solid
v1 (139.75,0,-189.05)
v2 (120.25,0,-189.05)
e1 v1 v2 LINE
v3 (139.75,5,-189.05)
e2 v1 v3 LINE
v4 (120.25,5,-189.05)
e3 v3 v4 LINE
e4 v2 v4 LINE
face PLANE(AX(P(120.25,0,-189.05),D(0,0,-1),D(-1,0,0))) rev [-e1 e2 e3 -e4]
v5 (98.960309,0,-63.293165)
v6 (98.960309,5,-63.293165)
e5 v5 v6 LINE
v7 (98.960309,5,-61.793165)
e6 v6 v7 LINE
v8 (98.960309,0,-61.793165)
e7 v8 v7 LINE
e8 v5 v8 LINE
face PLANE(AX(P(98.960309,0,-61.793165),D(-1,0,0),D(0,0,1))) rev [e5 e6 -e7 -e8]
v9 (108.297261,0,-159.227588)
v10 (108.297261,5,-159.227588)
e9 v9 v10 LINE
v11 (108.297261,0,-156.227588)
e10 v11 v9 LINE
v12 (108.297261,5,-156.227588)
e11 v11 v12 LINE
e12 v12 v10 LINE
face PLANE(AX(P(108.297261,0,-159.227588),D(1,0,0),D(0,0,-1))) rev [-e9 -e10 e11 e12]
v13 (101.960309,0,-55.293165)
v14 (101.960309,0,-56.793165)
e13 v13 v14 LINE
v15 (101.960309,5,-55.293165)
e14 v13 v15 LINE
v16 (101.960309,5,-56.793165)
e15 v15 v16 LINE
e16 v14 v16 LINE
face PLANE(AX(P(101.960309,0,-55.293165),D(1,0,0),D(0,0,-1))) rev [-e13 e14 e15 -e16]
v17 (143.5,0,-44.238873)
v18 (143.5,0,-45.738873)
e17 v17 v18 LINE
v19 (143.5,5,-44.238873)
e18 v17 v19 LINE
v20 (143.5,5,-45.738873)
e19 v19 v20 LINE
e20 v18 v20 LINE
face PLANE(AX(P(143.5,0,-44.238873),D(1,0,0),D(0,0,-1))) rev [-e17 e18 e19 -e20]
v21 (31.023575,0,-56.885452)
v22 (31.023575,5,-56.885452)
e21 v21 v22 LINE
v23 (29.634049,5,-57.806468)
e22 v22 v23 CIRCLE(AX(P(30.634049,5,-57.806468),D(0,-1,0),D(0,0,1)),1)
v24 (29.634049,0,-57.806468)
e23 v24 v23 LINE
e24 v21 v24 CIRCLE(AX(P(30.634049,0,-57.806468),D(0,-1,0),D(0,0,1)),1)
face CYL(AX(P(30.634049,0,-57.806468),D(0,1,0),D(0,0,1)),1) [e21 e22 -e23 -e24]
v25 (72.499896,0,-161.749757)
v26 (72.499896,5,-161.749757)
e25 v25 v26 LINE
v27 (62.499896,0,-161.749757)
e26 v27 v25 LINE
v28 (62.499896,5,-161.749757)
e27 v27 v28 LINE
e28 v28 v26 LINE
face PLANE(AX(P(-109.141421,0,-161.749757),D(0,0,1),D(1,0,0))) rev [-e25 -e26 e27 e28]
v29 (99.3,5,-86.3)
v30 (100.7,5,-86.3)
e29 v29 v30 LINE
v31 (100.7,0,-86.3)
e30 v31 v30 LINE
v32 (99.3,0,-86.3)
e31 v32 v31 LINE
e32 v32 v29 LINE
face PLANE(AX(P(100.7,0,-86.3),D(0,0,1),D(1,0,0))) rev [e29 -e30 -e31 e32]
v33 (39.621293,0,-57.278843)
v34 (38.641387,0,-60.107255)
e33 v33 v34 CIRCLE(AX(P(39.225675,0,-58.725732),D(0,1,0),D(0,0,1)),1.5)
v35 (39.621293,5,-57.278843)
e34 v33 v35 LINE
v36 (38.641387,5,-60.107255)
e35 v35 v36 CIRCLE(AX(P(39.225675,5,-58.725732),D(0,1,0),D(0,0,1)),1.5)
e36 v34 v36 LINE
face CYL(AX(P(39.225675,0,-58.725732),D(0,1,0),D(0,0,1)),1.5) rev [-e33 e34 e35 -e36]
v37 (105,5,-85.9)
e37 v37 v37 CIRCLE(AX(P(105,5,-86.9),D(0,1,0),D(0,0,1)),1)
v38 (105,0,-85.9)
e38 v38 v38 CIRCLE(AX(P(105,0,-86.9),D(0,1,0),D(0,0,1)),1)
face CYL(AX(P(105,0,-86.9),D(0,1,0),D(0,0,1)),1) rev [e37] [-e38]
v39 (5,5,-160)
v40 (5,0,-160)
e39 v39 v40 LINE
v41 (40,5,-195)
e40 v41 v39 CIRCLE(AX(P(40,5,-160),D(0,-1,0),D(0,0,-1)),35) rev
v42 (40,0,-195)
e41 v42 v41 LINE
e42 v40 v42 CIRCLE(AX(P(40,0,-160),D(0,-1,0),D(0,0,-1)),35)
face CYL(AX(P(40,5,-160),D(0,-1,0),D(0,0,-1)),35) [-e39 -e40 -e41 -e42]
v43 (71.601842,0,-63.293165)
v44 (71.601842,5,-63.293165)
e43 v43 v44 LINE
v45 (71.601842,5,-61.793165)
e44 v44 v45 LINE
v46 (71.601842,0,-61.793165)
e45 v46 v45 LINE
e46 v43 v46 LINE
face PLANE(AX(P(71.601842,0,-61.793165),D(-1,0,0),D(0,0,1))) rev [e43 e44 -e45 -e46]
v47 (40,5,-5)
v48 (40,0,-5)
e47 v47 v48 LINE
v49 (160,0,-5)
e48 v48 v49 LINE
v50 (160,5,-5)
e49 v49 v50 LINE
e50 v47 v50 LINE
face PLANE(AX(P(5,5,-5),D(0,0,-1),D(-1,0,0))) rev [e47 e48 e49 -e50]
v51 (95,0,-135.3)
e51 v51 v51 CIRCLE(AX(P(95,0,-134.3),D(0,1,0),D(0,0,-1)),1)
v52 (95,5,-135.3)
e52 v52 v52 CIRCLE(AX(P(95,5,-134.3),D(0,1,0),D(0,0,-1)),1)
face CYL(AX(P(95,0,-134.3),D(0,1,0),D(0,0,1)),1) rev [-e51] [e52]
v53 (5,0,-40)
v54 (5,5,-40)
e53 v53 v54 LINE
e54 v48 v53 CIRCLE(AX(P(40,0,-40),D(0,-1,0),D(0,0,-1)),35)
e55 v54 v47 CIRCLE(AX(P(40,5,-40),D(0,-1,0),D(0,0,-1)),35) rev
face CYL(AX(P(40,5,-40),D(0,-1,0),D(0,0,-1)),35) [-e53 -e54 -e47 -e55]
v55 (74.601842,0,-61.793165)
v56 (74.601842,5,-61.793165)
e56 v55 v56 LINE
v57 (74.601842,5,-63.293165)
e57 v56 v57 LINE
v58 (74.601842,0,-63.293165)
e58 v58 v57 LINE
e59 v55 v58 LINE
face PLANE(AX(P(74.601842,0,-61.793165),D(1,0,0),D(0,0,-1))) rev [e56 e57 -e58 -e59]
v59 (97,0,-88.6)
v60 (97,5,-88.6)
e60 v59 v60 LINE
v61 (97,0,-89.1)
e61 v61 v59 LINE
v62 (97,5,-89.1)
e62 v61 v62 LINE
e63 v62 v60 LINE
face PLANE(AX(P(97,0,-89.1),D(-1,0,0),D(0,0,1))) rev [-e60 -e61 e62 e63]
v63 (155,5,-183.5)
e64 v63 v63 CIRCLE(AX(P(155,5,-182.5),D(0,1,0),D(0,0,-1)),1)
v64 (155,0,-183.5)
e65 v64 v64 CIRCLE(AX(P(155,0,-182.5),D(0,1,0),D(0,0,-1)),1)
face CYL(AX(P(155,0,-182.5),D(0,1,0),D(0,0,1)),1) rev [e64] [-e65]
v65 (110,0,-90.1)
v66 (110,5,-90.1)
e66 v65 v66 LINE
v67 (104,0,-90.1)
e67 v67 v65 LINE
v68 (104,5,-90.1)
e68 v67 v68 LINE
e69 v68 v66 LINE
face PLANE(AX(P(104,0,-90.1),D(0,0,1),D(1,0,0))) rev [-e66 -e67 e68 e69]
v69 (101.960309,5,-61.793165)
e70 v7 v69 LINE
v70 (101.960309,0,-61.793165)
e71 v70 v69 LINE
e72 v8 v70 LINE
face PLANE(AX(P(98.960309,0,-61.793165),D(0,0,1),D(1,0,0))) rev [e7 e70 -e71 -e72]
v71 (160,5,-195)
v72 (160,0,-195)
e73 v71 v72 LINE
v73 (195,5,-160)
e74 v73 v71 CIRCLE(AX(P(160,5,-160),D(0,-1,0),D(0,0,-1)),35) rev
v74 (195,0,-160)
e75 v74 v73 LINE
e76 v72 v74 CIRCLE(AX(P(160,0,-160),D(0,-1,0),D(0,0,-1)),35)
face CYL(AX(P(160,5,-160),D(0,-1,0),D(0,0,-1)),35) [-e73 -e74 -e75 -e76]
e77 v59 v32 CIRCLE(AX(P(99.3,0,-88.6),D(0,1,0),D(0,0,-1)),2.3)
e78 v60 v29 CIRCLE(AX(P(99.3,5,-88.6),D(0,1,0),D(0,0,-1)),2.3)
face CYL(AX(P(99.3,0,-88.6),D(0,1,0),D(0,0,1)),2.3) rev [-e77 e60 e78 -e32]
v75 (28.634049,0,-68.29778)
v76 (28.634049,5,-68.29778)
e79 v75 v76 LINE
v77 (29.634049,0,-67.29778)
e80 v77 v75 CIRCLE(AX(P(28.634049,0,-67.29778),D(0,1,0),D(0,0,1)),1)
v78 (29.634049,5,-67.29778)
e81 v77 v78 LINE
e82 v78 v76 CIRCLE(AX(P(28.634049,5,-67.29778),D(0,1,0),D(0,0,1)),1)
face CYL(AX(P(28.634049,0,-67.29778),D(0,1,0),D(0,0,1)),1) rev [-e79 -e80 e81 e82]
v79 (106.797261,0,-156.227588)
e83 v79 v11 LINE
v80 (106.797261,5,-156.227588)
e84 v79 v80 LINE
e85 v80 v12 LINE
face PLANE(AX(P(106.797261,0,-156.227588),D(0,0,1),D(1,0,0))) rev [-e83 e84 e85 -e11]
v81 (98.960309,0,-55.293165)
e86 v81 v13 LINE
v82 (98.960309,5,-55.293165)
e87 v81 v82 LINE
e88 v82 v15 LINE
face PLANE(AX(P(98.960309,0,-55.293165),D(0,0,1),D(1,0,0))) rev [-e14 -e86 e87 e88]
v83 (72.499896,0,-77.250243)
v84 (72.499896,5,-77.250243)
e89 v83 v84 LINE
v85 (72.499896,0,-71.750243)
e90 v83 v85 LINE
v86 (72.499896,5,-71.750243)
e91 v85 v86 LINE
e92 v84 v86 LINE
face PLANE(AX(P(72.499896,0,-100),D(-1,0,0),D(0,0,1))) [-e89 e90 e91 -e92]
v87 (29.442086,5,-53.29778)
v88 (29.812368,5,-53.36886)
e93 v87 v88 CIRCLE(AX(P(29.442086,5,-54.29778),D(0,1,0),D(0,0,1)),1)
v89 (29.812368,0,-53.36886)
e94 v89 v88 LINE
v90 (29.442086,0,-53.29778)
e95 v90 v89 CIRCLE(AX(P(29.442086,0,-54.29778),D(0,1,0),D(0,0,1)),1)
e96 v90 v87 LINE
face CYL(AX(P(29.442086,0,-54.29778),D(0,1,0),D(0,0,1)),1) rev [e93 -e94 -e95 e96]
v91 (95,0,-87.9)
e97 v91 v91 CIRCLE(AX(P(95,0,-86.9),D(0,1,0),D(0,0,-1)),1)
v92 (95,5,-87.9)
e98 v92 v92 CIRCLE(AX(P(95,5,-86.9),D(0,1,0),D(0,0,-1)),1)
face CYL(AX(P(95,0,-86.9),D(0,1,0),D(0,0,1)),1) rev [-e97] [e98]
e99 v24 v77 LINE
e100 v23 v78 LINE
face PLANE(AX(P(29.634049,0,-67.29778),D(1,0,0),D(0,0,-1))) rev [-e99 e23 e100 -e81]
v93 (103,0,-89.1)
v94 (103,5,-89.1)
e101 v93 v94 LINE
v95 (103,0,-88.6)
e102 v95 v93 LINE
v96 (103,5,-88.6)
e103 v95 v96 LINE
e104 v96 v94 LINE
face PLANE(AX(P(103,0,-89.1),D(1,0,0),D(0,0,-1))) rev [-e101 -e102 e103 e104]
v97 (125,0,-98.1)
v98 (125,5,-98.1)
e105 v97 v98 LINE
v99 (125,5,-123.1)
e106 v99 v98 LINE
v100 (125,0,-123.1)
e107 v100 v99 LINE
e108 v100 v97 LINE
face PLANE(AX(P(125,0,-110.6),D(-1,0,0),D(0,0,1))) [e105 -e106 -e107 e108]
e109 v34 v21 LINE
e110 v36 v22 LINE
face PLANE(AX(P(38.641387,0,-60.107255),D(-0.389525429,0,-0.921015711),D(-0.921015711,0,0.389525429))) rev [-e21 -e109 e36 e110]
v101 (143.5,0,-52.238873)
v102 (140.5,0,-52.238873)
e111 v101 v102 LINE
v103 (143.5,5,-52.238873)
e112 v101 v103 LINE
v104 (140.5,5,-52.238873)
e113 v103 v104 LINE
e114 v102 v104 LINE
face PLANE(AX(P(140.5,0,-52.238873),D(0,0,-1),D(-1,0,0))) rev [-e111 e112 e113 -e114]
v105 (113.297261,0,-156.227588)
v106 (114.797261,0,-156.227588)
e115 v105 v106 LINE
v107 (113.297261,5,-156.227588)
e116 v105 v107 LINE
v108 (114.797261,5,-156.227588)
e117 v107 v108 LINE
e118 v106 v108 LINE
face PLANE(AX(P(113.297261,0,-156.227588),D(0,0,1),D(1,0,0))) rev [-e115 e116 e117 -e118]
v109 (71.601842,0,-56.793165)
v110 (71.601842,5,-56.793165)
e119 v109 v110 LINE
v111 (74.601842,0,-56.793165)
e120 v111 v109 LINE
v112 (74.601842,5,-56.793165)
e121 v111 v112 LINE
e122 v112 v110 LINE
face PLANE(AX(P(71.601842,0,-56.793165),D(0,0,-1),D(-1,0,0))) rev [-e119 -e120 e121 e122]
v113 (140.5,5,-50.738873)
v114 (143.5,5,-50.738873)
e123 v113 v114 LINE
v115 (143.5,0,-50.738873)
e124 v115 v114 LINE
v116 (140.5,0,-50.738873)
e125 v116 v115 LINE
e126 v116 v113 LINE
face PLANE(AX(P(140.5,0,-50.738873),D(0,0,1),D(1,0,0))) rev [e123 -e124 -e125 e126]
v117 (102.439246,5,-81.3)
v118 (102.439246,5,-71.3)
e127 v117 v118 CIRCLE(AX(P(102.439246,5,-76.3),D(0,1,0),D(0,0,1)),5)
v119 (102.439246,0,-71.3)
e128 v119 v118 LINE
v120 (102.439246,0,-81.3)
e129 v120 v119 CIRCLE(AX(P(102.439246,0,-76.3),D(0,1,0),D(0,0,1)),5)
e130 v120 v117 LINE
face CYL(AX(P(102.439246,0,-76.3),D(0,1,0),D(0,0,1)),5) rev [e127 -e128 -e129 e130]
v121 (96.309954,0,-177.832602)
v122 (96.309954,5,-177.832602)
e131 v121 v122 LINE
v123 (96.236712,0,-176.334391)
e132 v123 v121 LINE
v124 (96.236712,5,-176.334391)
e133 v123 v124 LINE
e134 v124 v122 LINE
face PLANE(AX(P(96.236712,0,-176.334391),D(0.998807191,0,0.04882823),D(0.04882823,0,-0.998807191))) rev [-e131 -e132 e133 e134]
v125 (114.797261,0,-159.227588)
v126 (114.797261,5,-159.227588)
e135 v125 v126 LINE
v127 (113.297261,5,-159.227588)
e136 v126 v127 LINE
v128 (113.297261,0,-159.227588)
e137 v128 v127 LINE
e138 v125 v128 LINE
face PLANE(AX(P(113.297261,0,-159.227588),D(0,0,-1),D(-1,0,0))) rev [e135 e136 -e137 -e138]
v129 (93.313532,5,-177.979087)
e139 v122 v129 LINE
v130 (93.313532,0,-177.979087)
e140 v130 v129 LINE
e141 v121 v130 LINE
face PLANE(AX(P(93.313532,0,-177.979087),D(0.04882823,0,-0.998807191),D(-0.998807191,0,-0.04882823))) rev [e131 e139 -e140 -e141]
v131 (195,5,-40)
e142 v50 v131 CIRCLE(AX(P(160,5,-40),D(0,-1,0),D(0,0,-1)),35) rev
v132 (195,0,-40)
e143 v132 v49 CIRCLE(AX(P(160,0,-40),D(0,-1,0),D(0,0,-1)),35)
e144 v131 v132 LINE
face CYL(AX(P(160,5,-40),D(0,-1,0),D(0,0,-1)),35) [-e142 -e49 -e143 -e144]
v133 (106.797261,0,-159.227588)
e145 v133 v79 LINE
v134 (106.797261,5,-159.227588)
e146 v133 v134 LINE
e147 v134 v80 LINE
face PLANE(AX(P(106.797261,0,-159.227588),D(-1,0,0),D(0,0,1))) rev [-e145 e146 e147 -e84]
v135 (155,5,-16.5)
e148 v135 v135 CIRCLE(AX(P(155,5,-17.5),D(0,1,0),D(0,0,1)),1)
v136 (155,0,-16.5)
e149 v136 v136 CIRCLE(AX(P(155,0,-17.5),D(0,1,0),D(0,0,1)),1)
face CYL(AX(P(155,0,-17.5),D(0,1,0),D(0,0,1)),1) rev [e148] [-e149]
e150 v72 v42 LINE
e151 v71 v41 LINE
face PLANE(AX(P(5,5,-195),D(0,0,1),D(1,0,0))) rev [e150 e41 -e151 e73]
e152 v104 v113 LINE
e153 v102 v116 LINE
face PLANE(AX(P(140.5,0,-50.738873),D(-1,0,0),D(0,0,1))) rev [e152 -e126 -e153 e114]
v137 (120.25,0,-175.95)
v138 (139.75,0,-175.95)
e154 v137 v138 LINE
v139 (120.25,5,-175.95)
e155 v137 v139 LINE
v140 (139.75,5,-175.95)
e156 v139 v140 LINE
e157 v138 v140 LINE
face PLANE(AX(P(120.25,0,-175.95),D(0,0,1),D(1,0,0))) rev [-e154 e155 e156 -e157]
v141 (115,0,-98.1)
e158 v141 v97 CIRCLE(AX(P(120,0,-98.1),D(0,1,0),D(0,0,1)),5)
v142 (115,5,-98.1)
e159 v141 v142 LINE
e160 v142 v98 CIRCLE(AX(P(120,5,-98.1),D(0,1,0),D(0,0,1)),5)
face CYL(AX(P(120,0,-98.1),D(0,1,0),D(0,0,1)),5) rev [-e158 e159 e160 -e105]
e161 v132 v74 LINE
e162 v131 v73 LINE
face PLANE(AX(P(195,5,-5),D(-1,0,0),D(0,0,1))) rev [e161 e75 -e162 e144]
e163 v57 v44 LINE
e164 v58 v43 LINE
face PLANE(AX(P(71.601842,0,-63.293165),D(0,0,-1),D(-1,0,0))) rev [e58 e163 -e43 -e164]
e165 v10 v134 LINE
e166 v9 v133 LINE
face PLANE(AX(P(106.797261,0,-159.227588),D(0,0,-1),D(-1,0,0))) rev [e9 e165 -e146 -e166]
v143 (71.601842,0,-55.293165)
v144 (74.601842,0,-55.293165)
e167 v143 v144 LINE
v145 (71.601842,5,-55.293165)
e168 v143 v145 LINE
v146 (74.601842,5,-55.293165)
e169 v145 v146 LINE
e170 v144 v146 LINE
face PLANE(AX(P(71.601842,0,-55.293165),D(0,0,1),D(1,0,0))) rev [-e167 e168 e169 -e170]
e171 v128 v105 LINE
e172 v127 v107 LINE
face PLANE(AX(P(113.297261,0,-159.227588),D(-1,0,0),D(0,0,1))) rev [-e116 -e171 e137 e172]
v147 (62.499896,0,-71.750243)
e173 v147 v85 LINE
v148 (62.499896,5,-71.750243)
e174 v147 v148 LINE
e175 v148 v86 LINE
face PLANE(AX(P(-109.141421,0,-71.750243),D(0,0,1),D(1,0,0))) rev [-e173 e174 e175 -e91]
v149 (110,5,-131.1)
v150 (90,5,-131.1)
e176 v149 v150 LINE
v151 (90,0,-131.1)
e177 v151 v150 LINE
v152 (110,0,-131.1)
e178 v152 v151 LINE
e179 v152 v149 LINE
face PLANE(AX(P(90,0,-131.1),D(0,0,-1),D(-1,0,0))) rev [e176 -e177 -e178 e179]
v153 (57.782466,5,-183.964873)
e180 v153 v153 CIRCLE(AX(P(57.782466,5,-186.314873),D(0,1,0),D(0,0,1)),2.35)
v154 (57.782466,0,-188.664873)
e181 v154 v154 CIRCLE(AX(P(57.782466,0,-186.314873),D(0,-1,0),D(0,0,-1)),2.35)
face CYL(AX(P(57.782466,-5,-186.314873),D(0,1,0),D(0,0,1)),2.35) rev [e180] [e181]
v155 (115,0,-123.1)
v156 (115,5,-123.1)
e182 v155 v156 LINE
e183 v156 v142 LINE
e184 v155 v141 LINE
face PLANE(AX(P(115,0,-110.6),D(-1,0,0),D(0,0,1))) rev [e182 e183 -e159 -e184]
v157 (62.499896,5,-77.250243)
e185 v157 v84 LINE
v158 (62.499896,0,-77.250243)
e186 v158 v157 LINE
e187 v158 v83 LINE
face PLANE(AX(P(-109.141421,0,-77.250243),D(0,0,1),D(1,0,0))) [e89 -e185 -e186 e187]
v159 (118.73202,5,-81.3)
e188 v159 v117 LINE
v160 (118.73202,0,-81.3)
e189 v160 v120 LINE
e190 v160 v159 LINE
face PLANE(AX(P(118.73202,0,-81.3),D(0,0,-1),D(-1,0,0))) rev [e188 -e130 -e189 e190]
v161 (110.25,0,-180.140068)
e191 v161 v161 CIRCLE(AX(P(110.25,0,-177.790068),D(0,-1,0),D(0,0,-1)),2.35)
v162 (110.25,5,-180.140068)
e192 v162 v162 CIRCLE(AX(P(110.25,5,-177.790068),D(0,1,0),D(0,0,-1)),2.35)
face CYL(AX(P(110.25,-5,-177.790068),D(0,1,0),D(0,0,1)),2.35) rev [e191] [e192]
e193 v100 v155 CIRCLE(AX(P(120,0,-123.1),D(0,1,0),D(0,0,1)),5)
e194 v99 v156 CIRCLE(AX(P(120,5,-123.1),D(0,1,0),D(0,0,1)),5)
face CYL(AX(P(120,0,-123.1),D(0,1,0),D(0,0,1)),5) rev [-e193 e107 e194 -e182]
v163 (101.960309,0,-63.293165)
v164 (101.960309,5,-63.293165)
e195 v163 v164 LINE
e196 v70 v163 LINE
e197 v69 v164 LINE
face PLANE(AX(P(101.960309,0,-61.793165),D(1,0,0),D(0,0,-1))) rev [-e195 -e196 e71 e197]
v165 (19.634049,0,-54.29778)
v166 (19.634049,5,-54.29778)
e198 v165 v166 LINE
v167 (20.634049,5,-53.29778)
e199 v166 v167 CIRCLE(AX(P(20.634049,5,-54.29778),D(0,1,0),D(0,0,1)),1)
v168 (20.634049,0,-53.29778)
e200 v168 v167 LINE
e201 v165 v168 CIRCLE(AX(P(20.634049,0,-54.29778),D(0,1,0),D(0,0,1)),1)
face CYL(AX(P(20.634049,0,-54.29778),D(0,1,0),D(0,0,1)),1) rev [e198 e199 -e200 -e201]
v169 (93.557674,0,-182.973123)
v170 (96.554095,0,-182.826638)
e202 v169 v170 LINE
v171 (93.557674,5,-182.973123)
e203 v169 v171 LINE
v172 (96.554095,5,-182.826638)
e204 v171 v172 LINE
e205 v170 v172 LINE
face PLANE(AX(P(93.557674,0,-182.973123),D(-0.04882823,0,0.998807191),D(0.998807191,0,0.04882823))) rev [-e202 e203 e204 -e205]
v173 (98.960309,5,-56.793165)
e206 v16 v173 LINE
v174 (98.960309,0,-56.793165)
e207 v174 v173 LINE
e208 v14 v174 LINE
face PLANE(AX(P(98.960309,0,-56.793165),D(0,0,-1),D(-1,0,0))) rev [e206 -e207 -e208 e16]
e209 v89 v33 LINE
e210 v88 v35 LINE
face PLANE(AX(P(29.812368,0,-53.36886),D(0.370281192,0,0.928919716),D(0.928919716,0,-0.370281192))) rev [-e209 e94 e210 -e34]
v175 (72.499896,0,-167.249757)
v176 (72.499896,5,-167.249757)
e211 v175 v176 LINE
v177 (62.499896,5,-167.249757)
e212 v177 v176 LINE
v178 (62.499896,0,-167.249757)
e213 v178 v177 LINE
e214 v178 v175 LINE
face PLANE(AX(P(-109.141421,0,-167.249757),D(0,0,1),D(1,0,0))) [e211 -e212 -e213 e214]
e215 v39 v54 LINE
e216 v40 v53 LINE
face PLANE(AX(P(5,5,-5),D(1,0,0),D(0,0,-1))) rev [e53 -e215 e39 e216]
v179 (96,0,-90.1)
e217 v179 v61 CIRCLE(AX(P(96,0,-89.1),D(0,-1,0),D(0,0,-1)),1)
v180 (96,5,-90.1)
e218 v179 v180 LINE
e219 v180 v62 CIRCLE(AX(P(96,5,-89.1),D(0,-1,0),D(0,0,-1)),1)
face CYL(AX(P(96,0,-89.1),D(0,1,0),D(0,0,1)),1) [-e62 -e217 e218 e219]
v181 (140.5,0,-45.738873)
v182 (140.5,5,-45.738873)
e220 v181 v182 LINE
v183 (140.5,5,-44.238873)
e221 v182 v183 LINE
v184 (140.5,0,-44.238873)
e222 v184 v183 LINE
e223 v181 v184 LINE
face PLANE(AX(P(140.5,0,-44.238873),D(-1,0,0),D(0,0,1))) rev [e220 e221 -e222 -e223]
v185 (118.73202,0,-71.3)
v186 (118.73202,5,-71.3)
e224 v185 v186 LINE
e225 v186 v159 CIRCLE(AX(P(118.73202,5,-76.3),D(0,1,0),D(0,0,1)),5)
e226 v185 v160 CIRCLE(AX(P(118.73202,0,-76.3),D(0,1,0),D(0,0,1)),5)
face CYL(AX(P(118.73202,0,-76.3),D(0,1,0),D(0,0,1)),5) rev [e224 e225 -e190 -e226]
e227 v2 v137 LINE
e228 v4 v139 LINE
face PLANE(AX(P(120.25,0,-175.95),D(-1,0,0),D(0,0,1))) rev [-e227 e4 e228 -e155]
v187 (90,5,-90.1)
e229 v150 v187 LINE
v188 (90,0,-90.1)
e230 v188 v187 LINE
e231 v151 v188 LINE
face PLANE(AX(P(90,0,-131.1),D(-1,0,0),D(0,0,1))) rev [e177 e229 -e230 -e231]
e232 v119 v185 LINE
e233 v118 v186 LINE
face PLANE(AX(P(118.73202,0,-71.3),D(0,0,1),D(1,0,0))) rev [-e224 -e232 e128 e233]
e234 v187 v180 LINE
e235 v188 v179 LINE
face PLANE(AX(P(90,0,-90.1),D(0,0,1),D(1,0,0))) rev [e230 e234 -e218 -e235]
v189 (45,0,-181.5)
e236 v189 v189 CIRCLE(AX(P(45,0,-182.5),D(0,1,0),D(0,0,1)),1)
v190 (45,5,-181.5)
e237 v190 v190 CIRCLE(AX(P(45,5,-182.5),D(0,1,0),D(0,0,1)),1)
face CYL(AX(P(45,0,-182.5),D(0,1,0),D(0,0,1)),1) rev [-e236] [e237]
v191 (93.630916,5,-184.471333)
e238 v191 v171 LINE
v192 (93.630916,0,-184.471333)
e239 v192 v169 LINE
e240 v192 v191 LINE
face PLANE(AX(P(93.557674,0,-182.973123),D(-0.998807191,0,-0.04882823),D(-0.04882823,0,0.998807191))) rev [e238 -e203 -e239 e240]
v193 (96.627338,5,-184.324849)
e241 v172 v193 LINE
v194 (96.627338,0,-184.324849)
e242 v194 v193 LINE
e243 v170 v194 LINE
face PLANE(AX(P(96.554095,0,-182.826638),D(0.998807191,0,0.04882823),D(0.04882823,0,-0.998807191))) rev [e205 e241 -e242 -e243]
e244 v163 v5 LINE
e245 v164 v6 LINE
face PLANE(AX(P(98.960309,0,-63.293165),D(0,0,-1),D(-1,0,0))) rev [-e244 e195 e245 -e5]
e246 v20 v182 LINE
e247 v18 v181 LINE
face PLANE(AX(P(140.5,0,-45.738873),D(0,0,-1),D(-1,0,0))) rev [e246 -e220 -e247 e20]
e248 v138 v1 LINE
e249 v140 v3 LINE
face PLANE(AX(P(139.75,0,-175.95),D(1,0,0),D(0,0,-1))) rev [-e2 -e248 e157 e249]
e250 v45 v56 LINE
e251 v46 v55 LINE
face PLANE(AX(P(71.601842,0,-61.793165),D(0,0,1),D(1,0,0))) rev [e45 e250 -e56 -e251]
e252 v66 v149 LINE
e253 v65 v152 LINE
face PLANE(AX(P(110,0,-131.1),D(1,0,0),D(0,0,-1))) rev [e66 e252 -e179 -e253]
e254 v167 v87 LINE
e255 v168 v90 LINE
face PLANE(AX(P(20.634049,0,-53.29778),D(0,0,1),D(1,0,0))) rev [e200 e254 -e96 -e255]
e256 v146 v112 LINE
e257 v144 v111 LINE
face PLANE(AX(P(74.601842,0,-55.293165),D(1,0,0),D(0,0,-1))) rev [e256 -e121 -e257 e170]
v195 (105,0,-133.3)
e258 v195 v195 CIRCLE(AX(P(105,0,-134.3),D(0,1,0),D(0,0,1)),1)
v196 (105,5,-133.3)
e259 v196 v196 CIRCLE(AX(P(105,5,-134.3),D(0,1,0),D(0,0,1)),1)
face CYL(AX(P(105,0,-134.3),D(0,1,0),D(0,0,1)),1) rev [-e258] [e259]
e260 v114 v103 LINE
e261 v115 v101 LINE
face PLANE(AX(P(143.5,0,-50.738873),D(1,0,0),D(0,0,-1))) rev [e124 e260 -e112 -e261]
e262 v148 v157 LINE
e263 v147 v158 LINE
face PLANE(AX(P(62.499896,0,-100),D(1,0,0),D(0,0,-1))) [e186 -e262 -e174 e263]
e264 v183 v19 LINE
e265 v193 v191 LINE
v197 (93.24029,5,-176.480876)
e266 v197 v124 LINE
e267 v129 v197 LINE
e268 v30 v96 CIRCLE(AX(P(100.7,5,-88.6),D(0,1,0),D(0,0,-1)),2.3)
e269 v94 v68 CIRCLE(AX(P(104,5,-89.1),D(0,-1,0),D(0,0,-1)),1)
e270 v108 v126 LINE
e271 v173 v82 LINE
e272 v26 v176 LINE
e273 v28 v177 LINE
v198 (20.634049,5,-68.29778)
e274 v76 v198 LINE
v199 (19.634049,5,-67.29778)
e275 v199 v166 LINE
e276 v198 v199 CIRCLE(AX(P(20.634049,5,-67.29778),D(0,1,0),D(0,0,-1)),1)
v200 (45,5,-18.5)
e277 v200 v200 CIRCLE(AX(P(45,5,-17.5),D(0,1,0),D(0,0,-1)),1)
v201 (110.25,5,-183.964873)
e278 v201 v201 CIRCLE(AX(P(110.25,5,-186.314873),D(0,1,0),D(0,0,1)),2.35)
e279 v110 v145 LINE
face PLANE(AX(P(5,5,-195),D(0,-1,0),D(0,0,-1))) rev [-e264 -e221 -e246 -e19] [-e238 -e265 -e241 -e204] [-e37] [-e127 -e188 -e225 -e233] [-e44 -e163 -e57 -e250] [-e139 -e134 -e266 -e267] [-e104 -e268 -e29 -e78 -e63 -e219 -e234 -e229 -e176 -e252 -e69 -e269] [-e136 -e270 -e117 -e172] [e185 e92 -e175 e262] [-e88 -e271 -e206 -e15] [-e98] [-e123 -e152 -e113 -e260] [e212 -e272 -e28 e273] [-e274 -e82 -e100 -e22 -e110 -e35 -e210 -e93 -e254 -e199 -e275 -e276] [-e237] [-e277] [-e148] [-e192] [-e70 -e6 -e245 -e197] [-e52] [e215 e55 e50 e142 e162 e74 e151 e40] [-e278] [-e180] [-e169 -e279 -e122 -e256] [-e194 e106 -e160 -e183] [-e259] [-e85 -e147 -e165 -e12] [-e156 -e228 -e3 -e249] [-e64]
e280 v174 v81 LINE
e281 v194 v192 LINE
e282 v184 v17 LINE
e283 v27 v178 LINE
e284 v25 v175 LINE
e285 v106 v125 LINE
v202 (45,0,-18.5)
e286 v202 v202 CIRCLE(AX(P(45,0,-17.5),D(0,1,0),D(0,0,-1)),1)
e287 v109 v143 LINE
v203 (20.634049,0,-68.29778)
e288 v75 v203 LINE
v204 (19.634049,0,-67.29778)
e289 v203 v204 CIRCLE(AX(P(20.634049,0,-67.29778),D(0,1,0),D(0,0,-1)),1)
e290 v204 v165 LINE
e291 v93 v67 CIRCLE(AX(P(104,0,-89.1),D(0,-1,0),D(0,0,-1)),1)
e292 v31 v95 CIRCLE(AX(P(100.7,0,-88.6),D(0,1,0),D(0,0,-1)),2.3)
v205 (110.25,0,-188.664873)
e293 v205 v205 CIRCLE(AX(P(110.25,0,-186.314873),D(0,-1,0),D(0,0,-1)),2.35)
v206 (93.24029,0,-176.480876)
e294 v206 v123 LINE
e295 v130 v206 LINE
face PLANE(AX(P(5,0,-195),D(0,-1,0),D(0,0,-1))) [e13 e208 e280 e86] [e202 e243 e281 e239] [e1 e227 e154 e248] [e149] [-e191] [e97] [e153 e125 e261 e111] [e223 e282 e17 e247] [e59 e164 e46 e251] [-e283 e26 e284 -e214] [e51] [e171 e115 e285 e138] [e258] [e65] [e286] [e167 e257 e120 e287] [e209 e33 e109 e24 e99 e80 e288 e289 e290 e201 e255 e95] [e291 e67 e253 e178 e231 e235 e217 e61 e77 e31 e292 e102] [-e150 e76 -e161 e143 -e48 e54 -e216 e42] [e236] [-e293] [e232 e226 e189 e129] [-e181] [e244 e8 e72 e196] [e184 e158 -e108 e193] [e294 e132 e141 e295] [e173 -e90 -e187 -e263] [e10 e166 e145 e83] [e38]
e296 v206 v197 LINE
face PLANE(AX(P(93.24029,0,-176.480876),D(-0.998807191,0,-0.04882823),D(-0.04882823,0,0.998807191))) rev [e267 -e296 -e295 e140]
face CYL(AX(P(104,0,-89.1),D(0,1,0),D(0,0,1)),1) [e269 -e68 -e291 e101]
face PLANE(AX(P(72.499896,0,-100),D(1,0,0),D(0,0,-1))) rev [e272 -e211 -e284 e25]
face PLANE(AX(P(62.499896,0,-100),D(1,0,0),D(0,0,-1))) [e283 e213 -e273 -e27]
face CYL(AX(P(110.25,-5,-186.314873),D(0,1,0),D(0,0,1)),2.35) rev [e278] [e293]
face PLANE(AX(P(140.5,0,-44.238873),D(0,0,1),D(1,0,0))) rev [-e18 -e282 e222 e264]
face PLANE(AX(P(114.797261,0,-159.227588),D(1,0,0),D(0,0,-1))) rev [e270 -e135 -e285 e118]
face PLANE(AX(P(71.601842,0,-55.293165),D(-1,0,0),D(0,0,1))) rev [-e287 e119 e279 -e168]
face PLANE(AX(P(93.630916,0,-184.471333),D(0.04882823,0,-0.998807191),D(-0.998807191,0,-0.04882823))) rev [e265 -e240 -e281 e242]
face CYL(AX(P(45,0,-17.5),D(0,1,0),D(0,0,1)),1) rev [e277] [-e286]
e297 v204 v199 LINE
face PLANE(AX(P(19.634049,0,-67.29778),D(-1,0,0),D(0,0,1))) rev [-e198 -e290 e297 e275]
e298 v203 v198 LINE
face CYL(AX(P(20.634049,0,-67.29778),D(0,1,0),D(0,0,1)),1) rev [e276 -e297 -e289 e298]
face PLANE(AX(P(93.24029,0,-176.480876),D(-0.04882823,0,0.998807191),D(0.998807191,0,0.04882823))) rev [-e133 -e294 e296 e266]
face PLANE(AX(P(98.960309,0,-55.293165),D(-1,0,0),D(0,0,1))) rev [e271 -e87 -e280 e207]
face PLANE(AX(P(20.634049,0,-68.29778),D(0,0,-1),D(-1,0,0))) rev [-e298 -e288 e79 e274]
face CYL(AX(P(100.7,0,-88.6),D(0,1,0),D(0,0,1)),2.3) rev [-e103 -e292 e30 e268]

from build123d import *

# Parameters (mm, degrees)
ESBO_O1_W                   = 190
ESBO_O1_H                   = 190
RESSALTO_EXTRUS_O1_DEPTH    = 5
ESBO_O2_R                   = 1
CORTE_EXTRUS_O1_DEPTH       = 276.816968296
ESBO_O3_R                   = 1
CORTE_EXTRUS_O2_DEPTH       = 5
FILETE1_R                   = 35
ESBO_O4_W                   = 19.5
ESBO_O4_H                   = 13.1
CORTE_EXTRUS_O3_DEPTH       = 276.816968296
SKETCH1_R                   = 2.35
CUT_EXTRUDE1_DEPTH          = 10
ESBO_O8_W                   = 10
ESBO_O8_H                   = 5.5
CORTE_EXTRUS_O4_DEPTH       = 276.816968296
CORTE_EXTRUS_O5_DEPTH       = 276.816968296
CORTE_EXTRUS_O7_DEPTH       = 276.816968296
CORTE_EXTRUS_O8_START       = -5
CORTE_EXTRUS_O8_OUTLINE_W   = 1.5
CORTE_EXTRUS_O8_OUTLINE_H   = 3
CORTE_EXTRUS_O8_OUTLINE_W_2 = 3
CORTE_EXTRUS_O8_OUTLINE_H_2 = 1.5
CORTE_EXTRUS_O8_DEPTH       = 5
CORTE_EXTRUS_O9_DEPTH       = 5


# Read off the part's stored shape, not the designer's step: Corte-extrusão8, Corte-extrusão9
with BuildPart() as part:
    # Esboço1 → Ressalto-extrusão1 (new body)
    with BuildSketch(Plane(origin=(0, 0, 0), x_dir=(1, 0, 0), z_dir=(0, 1, 0))):
        with Locations((100, 100)):
            Rectangle(ESBO_O1_W, ESBO_O1_H)
    extrude(amount=RESSALTO_EXTRUS_O1_DEPTH)

    # Esboço2 → Corte-extrusão1 (cut, through all)
    with BuildSketch(Plane(origin=(0, 5, 0), x_dir=(1, 0, 0), z_dir=(0, 1, 0))):
        with Locations(Location((105, 86.9, 0), (0, 0, 270))):
            Circle(ESBO_O2_R)
        with Locations(Location((105, 134.3, 0), (0, 0, 270))):
            Circle(ESBO_O2_R)
        with Locations(Location((95, 86.9, 0), (0, 0, 90))):
            Circle(ESBO_O2_R)
        with Locations(Location((95, 134.3, 0), (0, 0, 90))):
            Circle(ESBO_O2_R)
        with BuildLine():
            Line((90, 131.1), (110, 131.1))
            Line((110, 131.1), (110, 90.1))
            Line((110, 90.1), (104, 90.1))
            ThreePointArc((104, 90.1), (103.292893219, 89.807106781), (103, 89.1))
            Line((103, 89.1), (103, 88.6))
            ThreePointArc((103, 88.6), (102.326345597, 86.973654403), (100.7, 86.3))
            Line((100.7, 86.3), (99.3, 86.3))
            ThreePointArc((99.3, 86.3), (97.673654403, 86.973654403), (97, 88.6))
            Line((97, 88.6), (97, 89.1))
            ThreePointArc((97, 89.1), (96.707106781, 89.807106781), (96, 90.1))
            Line((96, 90.1), (90, 90.1))
            Line((90, 90.1), (90, 131.1))
        make_face()
    extrude(amount=-CORTE_EXTRUS_O1_DEPTH, mode=Mode.SUBTRACT)

    # Esboço3 → Corte-extrusão2 (cut)
    with BuildSketch(Plane(origin=(0, 5, 0), x_dir=(1, 0, 0), z_dir=(0, 1, 0))):
        with Locations(Location((45, 182.5, 0), (0, 0, 270))):
            Circle(ESBO_O3_R)
        with Locations(Location((45, 17.5, 0), (0, 0, 90))):
            Circle(ESBO_O3_R)
        with Locations(Location((155, 17.5, 0), (0, 0, 270))):
            Circle(ESBO_O3_R)
        with Locations(Location((155, 182.5, 0), (0, 0, 90))):
            Circle(ESBO_O3_R)
    extrude(amount=-CORTE_EXTRUS_O2_DEPTH, mode=Mode.SUBTRACT)

    # Filete1
    filete1_edges = [part.edges().sort_by_distance(p)[0] for p in [
        (5, 2.5, -195),
        (195, 2.5, -195),
        (195, 2.5, -5),
        (5, 2.5, -5),
    ]]
    fillet(filete1_edges, radius=FILETE1_R)

    # Esboço4 → Corte-extrusão3 (cut, through all)
    with BuildSketch(Plane(origin=(0, 5, 0), x_dir=(1, 0, 0), z_dir=(0, 1, 0))):
        with Locations((130, 182.5)):
            Rectangle(ESBO_O4_W, ESBO_O4_H)
    extrude(amount=-CORTE_EXTRUS_O3_DEPTH, mode=Mode.SUBTRACT)

    # Sketch1 → Cut-Extrude1 (cut)
    with BuildSketch(Plane(origin=(0, 5, 0), x_dir=(1, 0, 0), z_dir=(0, 1, 0))):
        with Locations(Location((110.25, 177.79006803, 0), (0, 0, 90))):
            Circle(SKETCH1_R)
        with Locations(Location((57.782465694, 186.314872597, 0), (0, 0, 270))):
            Circle(SKETCH1_R)
        with Locations(Location((110.25, 186.314872597, 0), (0, 0, 270))):
            Circle(SKETCH1_R)
    extrude(amount=-CUT_EXTRUDE1_DEPTH, mode=Mode.SUBTRACT)

    # Esboço8 → Corte-extrusão4 (cut, through all)
    with BuildSketch(Plane(origin=(0, 5, 0), x_dir=(-1, 0, 0), z_dir=(0, 1, 0))):
        with Locations((-67.499895869, -164.49975707)):
            Rectangle(ESBO_O8_W, ESBO_O8_H)
        with Locations((-67.499895869, -74.50024293)):
            Rectangle(ESBO_O8_W, ESBO_O8_H)
    extrude(amount=-CORTE_EXTRUS_O4_DEPTH, mode=Mode.SUBTRACT)

    # Esboço10 → Corte-extrusão5 (cut, through all)
    with BuildSketch(Plane(origin=(0, 5, 0), x_dir=(1, 0, 0), z_dir=(0, 1, 0))):
        with BuildLine():
            Line((29.81236761, 53.368860086), (39.621292879, 57.27884335))
            ThreePointArc((39.621292879, 57.27884335), (40.643023517, 59.216773827), (38.64138653, 60.107255383))
            Line((38.64138653, 60.107255383), (31.023574835, 56.885452176))
            ThreePointArc((31.023574835, 56.885452176), (30.081566568, 56.972943613), (29.634049405, 57.806467887))
            Line((29.634049405, 57.806467887), (29.634049405, 67.297779802))
            ThreePointArc((29.634049405, 67.297779802), (29.341156187, 68.004886583), (28.634049405, 68.297779802))
            Line((28.634049405, 68.297779802), (20.634049405, 68.297779802))
            ThreePointArc((20.634049405, 68.297779802), (19.926942624, 68.004886583), (19.634049405, 67.297779802))
            Line((19.634049405, 67.297779802), (19.634049405, 54.297779802))
            ThreePointArc((19.634049405, 54.297779802), (19.926942624, 53.590673021), (20.634049405, 53.297779802))
            Line((20.634049405, 53.297779802), (29.442086417, 53.297779802))
            ThreePointArc((29.442086417, 53.297779802), (29.63060735, 53.31571063), (29.81236761, 53.368860086))
        make_face()
    extrude(amount=-CORTE_EXTRUS_O5_DEPTH, mode=Mode.SUBTRACT)

    # Esboço12 → Corte-extrusão7 (cut, through all)
    with BuildSketch(Plane(origin=(0, 5, 0), x_dir=(1, 0, 0), z_dir=(0, 1, 0))):
        with BuildLine():
            Line((115, 123.1), (115, 98.1))
            ThreePointArc((115, 98.1), (120, 93.1), (125, 98.1))
            Line((125, 98.1), (125, 123.1))
            ThreePointArc((125, 123.1), (120, 128.1), (115, 123.1))
        make_face()
    extrude(amount=-CORTE_EXTRUS_O7_DEPTH, mode=Mode.SUBTRACT)

    # Corte-extrusão8 outline → Corte-extrusão8 (cut)
    with BuildSketch(Plane(origin=(0, 5, 0), x_dir=(1, 0, 0), z_dir=(0, 1, 0)).offset(CORTE_EXTRUS_O8_START)):
        Polygon((93.630915931, 184.471333361), (93.557673586, 182.973122575), (96.554095158, 182.826637886), (96.627337502, 184.324848672), align=None)
        Polygon((96.309954009, 177.832601933), (93.313532437, 177.979086622), (93.240290093, 176.480875836), (96.236711664, 176.334391147), align=None)
        with Locations((114.04726065, 157.727587795)):
            Rectangle(CORTE_EXTRUS_O8_OUTLINE_W, CORTE_EXTRUS_O8_OUTLINE_H)
        with Locations((107.54726065, 157.727587795)):
            Rectangle(CORTE_EXTRUS_O8_OUTLINE_W, CORTE_EXTRUS_O8_OUTLINE_H)
        with Locations((100.460308888, 62.543165179)):
            Rectangle(CORTE_EXTRUS_O8_OUTLINE_W_2, CORTE_EXTRUS_O8_OUTLINE_H_2)
        with Locations((73.101842496, 62.543165179)):
            Rectangle(CORTE_EXTRUS_O8_OUTLINE_W_2, CORTE_EXTRUS_O8_OUTLINE_H_2)
        with Locations((100.460308888, 56.043165179)):
            Rectangle(CORTE_EXTRUS_O8_OUTLINE_W_2, CORTE_EXTRUS_O8_OUTLINE_H_2)
        with Locations((73.101842496, 56.043165179)):
            Rectangle(CORTE_EXTRUS_O8_OUTLINE_W_2, CORTE_EXTRUS_O8_OUTLINE_H_2)
        with Locations((142, 51.488873394)):
            Rectangle(CORTE_EXTRUS_O8_OUTLINE_W_2, CORTE_EXTRUS_O8_OUTLINE_H_2)
        with Locations((142, 44.988873394)):
            Rectangle(CORTE_EXTRUS_O8_OUTLINE_W_2, CORTE_EXTRUS_O8_OUTLINE_H_2)
    extrude(amount=CORTE_EXTRUS_O8_DEPTH, mode=Mode.SUBTRACT)

    # Corte-extrusão9 outline → Corte-extrusão9 (cut)
    with BuildSketch(Plane(origin=(0, 0, 0), x_dir=(1, 0, 0), z_dir=(0, 1, 0))):
        with BuildLine():
            Line((102.439246138, 71.3), (118.732019964, 71.3))
            ThreePointArc((118.732019964, 71.3), (123.732019964, 76.3), (118.732019964, 81.3))
            Line((118.732019964, 81.3), (102.439246138, 81.3))
            ThreePointArc((102.439246138, 81.3), (97.439246138, 76.3), (102.439246138, 71.3))
        make_face()
    extrude(amount=CORTE_EXTRUS_O9_DEPTH, mode=Mode.SUBTRACT)


solid = part.part
